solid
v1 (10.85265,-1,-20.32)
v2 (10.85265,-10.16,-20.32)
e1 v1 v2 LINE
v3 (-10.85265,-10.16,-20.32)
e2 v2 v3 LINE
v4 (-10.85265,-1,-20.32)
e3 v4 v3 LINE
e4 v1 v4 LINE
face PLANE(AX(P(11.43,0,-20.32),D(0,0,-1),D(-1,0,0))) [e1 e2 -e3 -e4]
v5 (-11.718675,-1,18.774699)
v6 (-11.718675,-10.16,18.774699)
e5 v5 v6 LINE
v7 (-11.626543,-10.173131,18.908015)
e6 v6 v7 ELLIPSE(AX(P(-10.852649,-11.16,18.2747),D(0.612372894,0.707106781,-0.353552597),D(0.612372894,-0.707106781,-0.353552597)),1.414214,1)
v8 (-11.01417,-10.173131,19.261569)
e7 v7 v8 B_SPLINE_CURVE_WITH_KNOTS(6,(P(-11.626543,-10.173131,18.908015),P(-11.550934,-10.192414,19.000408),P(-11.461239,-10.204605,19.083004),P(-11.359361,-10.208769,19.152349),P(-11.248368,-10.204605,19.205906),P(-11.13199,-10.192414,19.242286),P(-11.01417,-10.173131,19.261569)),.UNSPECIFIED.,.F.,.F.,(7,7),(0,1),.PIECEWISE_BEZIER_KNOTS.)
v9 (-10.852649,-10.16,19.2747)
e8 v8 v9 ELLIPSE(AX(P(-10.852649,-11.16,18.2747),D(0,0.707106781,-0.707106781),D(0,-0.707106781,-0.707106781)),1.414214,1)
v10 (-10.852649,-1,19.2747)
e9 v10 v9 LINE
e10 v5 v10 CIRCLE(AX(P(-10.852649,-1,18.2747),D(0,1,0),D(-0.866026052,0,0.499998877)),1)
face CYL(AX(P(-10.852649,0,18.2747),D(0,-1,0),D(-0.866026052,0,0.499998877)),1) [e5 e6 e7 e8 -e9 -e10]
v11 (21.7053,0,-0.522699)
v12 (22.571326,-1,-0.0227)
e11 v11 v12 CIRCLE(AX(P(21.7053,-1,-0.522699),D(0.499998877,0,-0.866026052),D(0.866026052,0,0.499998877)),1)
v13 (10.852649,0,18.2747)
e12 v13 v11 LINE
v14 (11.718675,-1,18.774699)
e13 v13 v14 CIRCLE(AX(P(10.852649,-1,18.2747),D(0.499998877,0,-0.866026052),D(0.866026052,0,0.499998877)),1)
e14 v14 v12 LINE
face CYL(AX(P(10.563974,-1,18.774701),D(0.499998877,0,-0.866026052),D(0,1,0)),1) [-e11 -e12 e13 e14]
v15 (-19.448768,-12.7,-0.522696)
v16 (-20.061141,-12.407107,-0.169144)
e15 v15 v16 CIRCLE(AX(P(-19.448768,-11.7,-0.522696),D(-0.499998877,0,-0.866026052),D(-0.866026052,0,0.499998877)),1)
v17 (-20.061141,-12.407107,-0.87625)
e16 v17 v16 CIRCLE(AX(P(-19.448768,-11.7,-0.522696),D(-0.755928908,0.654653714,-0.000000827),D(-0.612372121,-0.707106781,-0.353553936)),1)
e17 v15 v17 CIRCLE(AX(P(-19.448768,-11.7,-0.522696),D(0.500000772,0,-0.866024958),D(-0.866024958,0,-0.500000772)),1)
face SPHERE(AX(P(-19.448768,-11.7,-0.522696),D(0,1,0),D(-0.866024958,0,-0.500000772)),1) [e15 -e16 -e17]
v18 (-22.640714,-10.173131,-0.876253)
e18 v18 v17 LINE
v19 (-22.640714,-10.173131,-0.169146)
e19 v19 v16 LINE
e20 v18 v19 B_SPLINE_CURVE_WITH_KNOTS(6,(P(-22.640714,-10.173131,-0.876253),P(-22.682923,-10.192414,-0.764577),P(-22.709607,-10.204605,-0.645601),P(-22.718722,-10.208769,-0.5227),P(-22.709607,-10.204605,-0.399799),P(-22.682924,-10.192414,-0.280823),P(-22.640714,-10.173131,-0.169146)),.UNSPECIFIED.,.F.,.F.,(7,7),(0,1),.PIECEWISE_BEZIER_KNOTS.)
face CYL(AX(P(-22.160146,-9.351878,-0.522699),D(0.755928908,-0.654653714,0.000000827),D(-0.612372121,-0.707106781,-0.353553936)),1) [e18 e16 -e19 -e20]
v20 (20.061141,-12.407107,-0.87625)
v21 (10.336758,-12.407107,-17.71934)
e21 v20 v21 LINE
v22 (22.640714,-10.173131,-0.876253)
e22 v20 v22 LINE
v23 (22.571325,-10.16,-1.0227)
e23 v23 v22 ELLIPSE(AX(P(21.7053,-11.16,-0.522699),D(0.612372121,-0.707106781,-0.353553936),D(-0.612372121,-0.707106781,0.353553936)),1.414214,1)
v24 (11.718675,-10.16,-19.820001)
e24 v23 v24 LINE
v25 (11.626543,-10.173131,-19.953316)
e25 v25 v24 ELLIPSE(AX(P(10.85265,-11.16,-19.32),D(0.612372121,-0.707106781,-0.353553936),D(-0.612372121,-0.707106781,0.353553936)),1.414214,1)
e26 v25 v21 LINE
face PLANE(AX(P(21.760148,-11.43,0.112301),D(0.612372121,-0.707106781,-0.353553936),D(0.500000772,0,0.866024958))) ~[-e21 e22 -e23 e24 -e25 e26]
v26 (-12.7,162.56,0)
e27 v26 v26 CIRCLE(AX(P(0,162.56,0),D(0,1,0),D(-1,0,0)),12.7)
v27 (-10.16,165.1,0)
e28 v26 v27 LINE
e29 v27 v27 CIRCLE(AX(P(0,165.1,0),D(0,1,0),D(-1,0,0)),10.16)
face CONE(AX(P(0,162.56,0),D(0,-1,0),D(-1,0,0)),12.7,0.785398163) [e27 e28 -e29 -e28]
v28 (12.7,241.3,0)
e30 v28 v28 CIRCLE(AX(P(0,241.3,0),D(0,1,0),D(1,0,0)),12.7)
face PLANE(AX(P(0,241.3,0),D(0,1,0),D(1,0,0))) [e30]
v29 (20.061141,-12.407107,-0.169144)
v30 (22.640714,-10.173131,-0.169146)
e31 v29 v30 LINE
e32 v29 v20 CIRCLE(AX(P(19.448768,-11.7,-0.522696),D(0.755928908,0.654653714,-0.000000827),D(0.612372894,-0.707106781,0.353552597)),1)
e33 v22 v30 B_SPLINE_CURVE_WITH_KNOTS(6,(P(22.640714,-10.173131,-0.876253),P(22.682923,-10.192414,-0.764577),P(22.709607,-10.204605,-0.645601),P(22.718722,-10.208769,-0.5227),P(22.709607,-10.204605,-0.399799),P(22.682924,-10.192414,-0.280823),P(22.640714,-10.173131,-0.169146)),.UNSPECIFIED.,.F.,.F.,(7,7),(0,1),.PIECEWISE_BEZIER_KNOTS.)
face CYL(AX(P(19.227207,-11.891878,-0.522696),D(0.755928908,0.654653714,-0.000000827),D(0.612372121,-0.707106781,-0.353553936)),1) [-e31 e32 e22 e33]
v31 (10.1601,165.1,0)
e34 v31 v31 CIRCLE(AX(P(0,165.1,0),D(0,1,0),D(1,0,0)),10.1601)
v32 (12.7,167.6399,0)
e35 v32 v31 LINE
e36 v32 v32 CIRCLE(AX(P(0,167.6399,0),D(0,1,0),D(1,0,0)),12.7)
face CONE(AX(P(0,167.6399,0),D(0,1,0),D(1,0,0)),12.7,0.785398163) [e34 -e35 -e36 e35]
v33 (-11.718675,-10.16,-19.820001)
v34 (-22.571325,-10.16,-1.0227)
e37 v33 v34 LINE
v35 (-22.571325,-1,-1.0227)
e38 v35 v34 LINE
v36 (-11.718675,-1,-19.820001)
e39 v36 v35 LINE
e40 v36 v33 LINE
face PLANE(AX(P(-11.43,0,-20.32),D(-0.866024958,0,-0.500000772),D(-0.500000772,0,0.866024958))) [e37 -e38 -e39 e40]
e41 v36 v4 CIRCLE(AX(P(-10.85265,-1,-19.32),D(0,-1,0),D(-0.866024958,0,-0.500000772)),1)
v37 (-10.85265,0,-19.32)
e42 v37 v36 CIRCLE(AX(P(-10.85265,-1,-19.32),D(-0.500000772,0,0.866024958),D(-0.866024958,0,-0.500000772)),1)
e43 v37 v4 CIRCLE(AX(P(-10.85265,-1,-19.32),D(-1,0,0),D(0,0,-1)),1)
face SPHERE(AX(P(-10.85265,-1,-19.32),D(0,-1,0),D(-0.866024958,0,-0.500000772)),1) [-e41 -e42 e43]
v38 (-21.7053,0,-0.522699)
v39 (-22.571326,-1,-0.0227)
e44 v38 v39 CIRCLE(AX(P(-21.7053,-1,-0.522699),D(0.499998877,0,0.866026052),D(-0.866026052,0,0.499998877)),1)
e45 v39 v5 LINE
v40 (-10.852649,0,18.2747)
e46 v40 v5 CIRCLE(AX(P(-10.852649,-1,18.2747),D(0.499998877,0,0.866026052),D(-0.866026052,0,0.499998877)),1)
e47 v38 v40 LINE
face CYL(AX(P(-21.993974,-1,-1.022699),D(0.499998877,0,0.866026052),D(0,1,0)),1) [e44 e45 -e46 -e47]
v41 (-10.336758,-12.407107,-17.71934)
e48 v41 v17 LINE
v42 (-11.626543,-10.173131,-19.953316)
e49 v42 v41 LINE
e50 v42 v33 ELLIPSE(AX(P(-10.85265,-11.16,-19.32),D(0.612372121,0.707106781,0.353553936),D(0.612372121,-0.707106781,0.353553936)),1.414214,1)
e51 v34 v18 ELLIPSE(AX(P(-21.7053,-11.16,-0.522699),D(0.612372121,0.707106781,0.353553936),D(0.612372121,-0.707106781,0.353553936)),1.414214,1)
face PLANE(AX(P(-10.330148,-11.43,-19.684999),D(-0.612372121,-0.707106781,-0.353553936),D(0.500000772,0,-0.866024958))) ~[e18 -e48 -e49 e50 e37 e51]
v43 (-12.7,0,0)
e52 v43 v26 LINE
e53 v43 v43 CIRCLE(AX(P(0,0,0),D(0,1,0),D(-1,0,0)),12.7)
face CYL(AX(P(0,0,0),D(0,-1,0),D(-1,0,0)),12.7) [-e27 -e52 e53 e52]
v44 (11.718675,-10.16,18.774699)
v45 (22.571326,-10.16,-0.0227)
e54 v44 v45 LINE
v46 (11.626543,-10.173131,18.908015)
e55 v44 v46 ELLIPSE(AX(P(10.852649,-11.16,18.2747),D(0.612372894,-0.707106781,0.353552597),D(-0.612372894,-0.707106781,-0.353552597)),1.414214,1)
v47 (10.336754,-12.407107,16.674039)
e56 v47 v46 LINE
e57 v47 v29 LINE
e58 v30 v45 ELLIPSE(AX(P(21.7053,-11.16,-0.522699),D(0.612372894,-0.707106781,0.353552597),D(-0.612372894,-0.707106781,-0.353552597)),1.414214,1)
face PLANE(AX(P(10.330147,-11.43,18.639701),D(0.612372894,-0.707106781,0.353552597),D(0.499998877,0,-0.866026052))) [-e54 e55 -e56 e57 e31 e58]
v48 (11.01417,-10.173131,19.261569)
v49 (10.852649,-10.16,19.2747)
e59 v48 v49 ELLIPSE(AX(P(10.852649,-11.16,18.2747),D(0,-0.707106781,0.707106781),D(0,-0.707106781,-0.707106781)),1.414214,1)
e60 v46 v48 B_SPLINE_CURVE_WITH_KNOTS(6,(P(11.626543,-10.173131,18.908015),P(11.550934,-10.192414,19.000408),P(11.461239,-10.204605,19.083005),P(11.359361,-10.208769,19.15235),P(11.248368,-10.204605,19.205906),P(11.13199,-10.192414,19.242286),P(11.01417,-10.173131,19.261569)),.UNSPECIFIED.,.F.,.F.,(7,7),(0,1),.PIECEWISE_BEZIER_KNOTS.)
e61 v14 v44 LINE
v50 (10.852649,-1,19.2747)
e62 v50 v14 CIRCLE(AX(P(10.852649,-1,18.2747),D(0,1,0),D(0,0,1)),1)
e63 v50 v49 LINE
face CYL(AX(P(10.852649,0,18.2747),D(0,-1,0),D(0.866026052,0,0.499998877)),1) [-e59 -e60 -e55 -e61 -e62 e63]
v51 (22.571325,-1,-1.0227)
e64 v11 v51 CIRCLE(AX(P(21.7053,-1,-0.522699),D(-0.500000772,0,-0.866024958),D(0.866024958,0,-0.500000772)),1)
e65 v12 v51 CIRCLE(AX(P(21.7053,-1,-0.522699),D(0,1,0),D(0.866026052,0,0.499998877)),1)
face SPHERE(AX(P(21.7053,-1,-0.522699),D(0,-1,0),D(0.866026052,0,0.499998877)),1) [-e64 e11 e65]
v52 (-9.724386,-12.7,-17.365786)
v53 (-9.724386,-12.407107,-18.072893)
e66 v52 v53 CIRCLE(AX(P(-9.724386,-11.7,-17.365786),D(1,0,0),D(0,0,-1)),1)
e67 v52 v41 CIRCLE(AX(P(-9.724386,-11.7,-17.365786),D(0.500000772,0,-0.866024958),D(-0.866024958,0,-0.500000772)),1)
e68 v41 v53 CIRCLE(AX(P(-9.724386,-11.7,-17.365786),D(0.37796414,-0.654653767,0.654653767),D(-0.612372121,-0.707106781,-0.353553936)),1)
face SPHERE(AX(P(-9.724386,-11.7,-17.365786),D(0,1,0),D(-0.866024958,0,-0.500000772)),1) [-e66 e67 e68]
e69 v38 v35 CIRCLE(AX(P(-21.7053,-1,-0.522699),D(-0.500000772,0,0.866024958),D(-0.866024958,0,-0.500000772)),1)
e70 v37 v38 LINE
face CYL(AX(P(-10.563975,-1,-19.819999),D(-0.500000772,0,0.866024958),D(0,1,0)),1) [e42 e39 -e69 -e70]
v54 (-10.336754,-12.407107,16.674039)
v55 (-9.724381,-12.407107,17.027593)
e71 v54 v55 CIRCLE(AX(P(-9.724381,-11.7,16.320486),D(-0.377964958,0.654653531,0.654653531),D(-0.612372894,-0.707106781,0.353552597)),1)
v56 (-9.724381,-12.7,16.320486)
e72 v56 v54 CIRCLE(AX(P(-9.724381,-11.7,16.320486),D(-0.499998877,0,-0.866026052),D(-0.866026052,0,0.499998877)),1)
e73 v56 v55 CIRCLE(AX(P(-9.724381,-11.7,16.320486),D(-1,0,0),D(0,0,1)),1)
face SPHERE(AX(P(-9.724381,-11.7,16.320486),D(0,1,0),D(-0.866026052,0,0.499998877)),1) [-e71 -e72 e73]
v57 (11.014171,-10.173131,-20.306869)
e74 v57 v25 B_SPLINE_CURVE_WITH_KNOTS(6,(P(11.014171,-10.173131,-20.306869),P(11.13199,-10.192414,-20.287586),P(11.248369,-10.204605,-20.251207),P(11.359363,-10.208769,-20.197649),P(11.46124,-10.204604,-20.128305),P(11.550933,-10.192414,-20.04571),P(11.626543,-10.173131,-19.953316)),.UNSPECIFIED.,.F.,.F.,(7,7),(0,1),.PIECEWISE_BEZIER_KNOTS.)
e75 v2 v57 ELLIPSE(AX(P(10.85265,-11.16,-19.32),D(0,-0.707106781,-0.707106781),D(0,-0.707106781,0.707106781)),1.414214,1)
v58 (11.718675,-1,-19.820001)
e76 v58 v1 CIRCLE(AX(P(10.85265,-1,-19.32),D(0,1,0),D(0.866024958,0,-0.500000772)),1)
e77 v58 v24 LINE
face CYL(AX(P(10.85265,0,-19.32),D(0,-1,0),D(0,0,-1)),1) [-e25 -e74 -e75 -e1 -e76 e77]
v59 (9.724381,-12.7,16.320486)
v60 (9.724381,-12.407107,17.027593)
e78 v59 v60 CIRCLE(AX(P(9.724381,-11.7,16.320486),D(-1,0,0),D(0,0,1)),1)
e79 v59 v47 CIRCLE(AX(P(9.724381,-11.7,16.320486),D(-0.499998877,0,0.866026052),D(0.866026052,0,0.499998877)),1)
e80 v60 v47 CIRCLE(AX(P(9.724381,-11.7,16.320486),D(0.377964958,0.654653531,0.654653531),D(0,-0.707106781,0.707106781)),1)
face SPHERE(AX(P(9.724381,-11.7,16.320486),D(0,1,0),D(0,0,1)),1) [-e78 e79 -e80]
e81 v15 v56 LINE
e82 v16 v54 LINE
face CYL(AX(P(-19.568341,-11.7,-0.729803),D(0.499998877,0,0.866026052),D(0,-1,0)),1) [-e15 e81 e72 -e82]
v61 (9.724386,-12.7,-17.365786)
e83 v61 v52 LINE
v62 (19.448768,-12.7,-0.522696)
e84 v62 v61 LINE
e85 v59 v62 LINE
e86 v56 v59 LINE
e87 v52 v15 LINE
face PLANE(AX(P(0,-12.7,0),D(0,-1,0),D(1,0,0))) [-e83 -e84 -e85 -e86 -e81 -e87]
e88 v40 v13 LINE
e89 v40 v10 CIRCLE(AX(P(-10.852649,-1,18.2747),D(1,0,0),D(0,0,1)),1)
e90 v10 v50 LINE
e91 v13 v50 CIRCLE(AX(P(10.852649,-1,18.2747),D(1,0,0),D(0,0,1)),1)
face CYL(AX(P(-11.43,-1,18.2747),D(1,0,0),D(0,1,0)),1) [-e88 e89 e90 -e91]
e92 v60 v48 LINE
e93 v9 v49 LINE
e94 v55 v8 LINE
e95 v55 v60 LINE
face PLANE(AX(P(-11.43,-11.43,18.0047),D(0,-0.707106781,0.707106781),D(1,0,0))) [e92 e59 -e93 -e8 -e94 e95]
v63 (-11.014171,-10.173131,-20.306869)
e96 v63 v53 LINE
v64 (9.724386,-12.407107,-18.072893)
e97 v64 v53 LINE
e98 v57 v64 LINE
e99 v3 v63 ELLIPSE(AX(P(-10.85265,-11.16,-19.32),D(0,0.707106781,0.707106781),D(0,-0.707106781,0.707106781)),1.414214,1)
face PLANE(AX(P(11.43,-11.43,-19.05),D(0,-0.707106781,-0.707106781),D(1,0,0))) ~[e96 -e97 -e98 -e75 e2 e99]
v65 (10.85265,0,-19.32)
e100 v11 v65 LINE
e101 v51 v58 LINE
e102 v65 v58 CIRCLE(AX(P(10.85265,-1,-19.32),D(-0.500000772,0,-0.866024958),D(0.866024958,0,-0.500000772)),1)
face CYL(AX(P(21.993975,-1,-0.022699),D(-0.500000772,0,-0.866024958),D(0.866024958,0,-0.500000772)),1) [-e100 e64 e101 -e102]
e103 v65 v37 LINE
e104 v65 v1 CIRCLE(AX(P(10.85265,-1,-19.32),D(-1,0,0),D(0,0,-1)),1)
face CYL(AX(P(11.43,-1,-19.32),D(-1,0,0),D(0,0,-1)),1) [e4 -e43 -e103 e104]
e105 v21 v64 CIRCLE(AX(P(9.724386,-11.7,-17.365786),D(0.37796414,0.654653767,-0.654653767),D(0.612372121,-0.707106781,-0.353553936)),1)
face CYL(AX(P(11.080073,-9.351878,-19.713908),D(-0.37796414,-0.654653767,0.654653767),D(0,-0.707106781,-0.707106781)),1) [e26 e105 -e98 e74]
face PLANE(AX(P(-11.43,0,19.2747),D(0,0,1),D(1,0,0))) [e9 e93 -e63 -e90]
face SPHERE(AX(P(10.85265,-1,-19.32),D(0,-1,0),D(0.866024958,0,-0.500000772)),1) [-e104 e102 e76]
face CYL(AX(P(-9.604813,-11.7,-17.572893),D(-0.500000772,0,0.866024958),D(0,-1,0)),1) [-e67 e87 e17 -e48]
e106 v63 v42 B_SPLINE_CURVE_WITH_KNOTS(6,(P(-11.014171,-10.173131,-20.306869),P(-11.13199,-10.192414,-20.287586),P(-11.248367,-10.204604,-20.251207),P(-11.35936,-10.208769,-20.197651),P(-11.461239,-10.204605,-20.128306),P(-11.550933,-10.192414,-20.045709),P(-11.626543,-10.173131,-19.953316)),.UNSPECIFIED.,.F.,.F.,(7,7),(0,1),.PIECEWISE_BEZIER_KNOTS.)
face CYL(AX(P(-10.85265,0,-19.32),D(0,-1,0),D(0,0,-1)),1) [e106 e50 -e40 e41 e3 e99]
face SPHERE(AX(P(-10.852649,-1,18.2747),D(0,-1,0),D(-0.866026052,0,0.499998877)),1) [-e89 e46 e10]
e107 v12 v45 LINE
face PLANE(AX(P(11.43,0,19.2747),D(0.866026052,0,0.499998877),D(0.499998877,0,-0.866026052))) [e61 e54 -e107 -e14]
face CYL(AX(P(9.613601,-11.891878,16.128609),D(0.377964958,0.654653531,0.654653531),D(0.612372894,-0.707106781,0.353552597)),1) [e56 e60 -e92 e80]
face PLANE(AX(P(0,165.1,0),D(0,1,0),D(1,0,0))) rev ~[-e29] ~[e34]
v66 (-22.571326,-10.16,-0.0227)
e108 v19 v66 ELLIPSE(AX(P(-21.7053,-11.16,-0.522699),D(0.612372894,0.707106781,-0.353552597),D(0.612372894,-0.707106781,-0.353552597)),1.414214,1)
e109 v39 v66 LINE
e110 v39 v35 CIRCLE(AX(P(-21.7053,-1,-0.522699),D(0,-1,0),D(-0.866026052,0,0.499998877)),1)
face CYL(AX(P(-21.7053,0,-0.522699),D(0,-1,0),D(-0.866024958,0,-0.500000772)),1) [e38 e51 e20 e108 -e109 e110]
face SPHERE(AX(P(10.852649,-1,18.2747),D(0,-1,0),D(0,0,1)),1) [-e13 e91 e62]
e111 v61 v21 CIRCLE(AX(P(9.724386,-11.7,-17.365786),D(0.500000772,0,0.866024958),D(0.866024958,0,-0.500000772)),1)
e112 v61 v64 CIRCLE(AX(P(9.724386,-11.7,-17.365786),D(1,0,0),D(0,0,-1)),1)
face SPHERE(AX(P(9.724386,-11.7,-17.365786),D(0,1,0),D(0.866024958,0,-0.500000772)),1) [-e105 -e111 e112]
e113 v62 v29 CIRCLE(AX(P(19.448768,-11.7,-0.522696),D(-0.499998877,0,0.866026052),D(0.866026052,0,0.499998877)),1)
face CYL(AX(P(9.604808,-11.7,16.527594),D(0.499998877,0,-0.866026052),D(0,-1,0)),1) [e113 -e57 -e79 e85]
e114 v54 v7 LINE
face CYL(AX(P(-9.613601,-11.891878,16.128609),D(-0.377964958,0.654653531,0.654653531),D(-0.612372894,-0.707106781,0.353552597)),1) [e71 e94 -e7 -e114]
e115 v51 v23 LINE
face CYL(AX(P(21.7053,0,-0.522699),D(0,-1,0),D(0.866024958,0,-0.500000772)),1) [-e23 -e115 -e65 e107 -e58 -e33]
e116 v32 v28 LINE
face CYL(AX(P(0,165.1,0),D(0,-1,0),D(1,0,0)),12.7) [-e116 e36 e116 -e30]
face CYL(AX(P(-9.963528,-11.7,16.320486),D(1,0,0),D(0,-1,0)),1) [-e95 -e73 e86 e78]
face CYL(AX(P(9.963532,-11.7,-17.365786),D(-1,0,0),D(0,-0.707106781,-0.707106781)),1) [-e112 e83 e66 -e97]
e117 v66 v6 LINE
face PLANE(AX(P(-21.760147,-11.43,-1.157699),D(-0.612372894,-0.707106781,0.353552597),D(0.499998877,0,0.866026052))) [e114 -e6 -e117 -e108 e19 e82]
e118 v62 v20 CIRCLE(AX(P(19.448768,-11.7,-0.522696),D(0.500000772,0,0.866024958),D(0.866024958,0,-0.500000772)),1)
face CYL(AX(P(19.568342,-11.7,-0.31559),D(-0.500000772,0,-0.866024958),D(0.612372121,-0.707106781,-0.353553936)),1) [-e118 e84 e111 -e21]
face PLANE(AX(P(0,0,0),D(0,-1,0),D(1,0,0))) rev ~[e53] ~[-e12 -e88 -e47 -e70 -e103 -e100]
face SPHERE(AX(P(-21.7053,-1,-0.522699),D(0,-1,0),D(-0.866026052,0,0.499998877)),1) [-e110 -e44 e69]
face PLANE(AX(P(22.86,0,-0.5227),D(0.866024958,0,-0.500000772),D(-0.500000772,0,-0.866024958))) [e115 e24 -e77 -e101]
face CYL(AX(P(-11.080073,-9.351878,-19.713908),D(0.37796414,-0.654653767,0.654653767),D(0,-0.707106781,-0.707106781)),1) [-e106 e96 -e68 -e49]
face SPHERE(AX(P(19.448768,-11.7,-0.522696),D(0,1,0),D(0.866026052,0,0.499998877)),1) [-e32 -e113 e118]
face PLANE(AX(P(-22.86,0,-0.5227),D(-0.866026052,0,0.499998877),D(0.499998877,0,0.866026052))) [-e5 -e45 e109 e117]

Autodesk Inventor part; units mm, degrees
ref_plane "YZ Plane" through (0, 0, 0) normal (1, 0, 0) x (0, 1, 0)
ref_plane "XZ Plane" through (0, 0, 0) normal (0, 1, 0) x (-1, 0, 0)
ref_plane "XY Plane" through (0, 0, 0) normal (0, 0, 1) x (1, 0, 0)
sketch "Sketch1" plane through (0, 0, 0) normal (0, 1, 0) x (-1, 0, 0)
  circle A0 centre (0, 0) radius 12.7
  dimension "d0" = 25.4
extrude "Extrusion1" add sketch "Sketch1" along normal blind 165.1
sketch "Sketch2" plane through (0, 165.1, 0) normal (0, 1, 0) x (1, 0, 0)
  circle A0 centre (0, 0) radius 12.7 projected
chamfer "Chamfer1" distance 2.54 angle 45 1 edges at (12.7, 165.1, 0)
extrude "Extrusion2" add sketch "Sketch2" along normal blind 76.2
thread "Thread2" size "1-8 UNC" class "2A" standard "ANSI Unified Screw Threads" full length
chamfer "Chamfer2" distance 2.54 angle 45 1 edges at (-12.7, 165.1, 0)
sketch "Sketch3" plane through (0, 0, 0) normal (0, -1, 0) x (1, 0, 0)
  line L0 (0, 20.32) -> (0, -20.32) construction
  line L1 (0, -20.32) -> (11.43, -20.32) construction
  line L2 (11.43, -20.32) -> (-11.43, -20.32)
  line L3 (-11.43, -20.32) -> (-22.86, -0.5227)
  line L4 (-22.86, -0.5227) -> (-11.43, 19.2747)
  line L5 (-11.43, 19.2747) -> (11.43, 19.2747)
  line L6 (11.43, 19.2747) -> (22.86, -0.5227)
  line L7 (22.86, -0.5227) -> (11.43, -20.32)
  point P0 (0, 0)
  dimension "d18" = 20.32
  dimension "d19" = 40.64
  dimension "d20" = 11.43
  dimension "d21" = 22.86
  dimension "d22" = 22.86
  dimension "d23" = 120
  dimension "d24" = 22.86
  dimension "d25" = 22.86
  dimension "d26" = 120
extrude "Extrusion3" add sketch "Sketch3" along normal blind 12.7
chamfer "Chamfer3" distance 2.54 angle 45 6 edges at (0, -12.7, -20.32) (-17.145, -12.7, -10.4213) (-17.145, -12.7, 9.376) (0, -12.7, 19.2747) (17.145, -12.7, 9.376) (17.145, -12.7, -10.4213)
fillet "Fillet1" radius 1 12 edges at (-10.6968, -11.43, -19.05) (10.6968, -11.43, -19.05) (21.3935, -11.43, -0.5227) (10.6968, -11.43, 18.0047) (-10.6968, -11.43, 18.0047) (-21.3935, -11.43, -0.5227) (-14.9453, -12.7, -9.1513) (-14.9453, -12.7, 8.106) (0, -12.7, 16.7347) (14.9453, -12.7, 8.106) (14.9453, -12.7, -9.1513) (0, -12.7, -17.78)
fillet "Fillet2" radius 1 12 edges at (11.43, -5.0343, -20.32) (22.86, -5.0343, -0.5227) (11.43, -5.0343, 19.2747) (-11.43, -5.0343, 19.2747) (-22.86, -5.0343, -0.5227) (-11.43, -5.0343, -20.32) (-17.145, 0, 9.376) (-17.145, 0, -10.4213) (0, 0, 19.2747) (17.145, 0, 9.376) (17.145, 0, -10.4213) (0, 0, -20.32)
properties part number "CIM Mount Bolt" material "Aluminum 6061-AHC"
